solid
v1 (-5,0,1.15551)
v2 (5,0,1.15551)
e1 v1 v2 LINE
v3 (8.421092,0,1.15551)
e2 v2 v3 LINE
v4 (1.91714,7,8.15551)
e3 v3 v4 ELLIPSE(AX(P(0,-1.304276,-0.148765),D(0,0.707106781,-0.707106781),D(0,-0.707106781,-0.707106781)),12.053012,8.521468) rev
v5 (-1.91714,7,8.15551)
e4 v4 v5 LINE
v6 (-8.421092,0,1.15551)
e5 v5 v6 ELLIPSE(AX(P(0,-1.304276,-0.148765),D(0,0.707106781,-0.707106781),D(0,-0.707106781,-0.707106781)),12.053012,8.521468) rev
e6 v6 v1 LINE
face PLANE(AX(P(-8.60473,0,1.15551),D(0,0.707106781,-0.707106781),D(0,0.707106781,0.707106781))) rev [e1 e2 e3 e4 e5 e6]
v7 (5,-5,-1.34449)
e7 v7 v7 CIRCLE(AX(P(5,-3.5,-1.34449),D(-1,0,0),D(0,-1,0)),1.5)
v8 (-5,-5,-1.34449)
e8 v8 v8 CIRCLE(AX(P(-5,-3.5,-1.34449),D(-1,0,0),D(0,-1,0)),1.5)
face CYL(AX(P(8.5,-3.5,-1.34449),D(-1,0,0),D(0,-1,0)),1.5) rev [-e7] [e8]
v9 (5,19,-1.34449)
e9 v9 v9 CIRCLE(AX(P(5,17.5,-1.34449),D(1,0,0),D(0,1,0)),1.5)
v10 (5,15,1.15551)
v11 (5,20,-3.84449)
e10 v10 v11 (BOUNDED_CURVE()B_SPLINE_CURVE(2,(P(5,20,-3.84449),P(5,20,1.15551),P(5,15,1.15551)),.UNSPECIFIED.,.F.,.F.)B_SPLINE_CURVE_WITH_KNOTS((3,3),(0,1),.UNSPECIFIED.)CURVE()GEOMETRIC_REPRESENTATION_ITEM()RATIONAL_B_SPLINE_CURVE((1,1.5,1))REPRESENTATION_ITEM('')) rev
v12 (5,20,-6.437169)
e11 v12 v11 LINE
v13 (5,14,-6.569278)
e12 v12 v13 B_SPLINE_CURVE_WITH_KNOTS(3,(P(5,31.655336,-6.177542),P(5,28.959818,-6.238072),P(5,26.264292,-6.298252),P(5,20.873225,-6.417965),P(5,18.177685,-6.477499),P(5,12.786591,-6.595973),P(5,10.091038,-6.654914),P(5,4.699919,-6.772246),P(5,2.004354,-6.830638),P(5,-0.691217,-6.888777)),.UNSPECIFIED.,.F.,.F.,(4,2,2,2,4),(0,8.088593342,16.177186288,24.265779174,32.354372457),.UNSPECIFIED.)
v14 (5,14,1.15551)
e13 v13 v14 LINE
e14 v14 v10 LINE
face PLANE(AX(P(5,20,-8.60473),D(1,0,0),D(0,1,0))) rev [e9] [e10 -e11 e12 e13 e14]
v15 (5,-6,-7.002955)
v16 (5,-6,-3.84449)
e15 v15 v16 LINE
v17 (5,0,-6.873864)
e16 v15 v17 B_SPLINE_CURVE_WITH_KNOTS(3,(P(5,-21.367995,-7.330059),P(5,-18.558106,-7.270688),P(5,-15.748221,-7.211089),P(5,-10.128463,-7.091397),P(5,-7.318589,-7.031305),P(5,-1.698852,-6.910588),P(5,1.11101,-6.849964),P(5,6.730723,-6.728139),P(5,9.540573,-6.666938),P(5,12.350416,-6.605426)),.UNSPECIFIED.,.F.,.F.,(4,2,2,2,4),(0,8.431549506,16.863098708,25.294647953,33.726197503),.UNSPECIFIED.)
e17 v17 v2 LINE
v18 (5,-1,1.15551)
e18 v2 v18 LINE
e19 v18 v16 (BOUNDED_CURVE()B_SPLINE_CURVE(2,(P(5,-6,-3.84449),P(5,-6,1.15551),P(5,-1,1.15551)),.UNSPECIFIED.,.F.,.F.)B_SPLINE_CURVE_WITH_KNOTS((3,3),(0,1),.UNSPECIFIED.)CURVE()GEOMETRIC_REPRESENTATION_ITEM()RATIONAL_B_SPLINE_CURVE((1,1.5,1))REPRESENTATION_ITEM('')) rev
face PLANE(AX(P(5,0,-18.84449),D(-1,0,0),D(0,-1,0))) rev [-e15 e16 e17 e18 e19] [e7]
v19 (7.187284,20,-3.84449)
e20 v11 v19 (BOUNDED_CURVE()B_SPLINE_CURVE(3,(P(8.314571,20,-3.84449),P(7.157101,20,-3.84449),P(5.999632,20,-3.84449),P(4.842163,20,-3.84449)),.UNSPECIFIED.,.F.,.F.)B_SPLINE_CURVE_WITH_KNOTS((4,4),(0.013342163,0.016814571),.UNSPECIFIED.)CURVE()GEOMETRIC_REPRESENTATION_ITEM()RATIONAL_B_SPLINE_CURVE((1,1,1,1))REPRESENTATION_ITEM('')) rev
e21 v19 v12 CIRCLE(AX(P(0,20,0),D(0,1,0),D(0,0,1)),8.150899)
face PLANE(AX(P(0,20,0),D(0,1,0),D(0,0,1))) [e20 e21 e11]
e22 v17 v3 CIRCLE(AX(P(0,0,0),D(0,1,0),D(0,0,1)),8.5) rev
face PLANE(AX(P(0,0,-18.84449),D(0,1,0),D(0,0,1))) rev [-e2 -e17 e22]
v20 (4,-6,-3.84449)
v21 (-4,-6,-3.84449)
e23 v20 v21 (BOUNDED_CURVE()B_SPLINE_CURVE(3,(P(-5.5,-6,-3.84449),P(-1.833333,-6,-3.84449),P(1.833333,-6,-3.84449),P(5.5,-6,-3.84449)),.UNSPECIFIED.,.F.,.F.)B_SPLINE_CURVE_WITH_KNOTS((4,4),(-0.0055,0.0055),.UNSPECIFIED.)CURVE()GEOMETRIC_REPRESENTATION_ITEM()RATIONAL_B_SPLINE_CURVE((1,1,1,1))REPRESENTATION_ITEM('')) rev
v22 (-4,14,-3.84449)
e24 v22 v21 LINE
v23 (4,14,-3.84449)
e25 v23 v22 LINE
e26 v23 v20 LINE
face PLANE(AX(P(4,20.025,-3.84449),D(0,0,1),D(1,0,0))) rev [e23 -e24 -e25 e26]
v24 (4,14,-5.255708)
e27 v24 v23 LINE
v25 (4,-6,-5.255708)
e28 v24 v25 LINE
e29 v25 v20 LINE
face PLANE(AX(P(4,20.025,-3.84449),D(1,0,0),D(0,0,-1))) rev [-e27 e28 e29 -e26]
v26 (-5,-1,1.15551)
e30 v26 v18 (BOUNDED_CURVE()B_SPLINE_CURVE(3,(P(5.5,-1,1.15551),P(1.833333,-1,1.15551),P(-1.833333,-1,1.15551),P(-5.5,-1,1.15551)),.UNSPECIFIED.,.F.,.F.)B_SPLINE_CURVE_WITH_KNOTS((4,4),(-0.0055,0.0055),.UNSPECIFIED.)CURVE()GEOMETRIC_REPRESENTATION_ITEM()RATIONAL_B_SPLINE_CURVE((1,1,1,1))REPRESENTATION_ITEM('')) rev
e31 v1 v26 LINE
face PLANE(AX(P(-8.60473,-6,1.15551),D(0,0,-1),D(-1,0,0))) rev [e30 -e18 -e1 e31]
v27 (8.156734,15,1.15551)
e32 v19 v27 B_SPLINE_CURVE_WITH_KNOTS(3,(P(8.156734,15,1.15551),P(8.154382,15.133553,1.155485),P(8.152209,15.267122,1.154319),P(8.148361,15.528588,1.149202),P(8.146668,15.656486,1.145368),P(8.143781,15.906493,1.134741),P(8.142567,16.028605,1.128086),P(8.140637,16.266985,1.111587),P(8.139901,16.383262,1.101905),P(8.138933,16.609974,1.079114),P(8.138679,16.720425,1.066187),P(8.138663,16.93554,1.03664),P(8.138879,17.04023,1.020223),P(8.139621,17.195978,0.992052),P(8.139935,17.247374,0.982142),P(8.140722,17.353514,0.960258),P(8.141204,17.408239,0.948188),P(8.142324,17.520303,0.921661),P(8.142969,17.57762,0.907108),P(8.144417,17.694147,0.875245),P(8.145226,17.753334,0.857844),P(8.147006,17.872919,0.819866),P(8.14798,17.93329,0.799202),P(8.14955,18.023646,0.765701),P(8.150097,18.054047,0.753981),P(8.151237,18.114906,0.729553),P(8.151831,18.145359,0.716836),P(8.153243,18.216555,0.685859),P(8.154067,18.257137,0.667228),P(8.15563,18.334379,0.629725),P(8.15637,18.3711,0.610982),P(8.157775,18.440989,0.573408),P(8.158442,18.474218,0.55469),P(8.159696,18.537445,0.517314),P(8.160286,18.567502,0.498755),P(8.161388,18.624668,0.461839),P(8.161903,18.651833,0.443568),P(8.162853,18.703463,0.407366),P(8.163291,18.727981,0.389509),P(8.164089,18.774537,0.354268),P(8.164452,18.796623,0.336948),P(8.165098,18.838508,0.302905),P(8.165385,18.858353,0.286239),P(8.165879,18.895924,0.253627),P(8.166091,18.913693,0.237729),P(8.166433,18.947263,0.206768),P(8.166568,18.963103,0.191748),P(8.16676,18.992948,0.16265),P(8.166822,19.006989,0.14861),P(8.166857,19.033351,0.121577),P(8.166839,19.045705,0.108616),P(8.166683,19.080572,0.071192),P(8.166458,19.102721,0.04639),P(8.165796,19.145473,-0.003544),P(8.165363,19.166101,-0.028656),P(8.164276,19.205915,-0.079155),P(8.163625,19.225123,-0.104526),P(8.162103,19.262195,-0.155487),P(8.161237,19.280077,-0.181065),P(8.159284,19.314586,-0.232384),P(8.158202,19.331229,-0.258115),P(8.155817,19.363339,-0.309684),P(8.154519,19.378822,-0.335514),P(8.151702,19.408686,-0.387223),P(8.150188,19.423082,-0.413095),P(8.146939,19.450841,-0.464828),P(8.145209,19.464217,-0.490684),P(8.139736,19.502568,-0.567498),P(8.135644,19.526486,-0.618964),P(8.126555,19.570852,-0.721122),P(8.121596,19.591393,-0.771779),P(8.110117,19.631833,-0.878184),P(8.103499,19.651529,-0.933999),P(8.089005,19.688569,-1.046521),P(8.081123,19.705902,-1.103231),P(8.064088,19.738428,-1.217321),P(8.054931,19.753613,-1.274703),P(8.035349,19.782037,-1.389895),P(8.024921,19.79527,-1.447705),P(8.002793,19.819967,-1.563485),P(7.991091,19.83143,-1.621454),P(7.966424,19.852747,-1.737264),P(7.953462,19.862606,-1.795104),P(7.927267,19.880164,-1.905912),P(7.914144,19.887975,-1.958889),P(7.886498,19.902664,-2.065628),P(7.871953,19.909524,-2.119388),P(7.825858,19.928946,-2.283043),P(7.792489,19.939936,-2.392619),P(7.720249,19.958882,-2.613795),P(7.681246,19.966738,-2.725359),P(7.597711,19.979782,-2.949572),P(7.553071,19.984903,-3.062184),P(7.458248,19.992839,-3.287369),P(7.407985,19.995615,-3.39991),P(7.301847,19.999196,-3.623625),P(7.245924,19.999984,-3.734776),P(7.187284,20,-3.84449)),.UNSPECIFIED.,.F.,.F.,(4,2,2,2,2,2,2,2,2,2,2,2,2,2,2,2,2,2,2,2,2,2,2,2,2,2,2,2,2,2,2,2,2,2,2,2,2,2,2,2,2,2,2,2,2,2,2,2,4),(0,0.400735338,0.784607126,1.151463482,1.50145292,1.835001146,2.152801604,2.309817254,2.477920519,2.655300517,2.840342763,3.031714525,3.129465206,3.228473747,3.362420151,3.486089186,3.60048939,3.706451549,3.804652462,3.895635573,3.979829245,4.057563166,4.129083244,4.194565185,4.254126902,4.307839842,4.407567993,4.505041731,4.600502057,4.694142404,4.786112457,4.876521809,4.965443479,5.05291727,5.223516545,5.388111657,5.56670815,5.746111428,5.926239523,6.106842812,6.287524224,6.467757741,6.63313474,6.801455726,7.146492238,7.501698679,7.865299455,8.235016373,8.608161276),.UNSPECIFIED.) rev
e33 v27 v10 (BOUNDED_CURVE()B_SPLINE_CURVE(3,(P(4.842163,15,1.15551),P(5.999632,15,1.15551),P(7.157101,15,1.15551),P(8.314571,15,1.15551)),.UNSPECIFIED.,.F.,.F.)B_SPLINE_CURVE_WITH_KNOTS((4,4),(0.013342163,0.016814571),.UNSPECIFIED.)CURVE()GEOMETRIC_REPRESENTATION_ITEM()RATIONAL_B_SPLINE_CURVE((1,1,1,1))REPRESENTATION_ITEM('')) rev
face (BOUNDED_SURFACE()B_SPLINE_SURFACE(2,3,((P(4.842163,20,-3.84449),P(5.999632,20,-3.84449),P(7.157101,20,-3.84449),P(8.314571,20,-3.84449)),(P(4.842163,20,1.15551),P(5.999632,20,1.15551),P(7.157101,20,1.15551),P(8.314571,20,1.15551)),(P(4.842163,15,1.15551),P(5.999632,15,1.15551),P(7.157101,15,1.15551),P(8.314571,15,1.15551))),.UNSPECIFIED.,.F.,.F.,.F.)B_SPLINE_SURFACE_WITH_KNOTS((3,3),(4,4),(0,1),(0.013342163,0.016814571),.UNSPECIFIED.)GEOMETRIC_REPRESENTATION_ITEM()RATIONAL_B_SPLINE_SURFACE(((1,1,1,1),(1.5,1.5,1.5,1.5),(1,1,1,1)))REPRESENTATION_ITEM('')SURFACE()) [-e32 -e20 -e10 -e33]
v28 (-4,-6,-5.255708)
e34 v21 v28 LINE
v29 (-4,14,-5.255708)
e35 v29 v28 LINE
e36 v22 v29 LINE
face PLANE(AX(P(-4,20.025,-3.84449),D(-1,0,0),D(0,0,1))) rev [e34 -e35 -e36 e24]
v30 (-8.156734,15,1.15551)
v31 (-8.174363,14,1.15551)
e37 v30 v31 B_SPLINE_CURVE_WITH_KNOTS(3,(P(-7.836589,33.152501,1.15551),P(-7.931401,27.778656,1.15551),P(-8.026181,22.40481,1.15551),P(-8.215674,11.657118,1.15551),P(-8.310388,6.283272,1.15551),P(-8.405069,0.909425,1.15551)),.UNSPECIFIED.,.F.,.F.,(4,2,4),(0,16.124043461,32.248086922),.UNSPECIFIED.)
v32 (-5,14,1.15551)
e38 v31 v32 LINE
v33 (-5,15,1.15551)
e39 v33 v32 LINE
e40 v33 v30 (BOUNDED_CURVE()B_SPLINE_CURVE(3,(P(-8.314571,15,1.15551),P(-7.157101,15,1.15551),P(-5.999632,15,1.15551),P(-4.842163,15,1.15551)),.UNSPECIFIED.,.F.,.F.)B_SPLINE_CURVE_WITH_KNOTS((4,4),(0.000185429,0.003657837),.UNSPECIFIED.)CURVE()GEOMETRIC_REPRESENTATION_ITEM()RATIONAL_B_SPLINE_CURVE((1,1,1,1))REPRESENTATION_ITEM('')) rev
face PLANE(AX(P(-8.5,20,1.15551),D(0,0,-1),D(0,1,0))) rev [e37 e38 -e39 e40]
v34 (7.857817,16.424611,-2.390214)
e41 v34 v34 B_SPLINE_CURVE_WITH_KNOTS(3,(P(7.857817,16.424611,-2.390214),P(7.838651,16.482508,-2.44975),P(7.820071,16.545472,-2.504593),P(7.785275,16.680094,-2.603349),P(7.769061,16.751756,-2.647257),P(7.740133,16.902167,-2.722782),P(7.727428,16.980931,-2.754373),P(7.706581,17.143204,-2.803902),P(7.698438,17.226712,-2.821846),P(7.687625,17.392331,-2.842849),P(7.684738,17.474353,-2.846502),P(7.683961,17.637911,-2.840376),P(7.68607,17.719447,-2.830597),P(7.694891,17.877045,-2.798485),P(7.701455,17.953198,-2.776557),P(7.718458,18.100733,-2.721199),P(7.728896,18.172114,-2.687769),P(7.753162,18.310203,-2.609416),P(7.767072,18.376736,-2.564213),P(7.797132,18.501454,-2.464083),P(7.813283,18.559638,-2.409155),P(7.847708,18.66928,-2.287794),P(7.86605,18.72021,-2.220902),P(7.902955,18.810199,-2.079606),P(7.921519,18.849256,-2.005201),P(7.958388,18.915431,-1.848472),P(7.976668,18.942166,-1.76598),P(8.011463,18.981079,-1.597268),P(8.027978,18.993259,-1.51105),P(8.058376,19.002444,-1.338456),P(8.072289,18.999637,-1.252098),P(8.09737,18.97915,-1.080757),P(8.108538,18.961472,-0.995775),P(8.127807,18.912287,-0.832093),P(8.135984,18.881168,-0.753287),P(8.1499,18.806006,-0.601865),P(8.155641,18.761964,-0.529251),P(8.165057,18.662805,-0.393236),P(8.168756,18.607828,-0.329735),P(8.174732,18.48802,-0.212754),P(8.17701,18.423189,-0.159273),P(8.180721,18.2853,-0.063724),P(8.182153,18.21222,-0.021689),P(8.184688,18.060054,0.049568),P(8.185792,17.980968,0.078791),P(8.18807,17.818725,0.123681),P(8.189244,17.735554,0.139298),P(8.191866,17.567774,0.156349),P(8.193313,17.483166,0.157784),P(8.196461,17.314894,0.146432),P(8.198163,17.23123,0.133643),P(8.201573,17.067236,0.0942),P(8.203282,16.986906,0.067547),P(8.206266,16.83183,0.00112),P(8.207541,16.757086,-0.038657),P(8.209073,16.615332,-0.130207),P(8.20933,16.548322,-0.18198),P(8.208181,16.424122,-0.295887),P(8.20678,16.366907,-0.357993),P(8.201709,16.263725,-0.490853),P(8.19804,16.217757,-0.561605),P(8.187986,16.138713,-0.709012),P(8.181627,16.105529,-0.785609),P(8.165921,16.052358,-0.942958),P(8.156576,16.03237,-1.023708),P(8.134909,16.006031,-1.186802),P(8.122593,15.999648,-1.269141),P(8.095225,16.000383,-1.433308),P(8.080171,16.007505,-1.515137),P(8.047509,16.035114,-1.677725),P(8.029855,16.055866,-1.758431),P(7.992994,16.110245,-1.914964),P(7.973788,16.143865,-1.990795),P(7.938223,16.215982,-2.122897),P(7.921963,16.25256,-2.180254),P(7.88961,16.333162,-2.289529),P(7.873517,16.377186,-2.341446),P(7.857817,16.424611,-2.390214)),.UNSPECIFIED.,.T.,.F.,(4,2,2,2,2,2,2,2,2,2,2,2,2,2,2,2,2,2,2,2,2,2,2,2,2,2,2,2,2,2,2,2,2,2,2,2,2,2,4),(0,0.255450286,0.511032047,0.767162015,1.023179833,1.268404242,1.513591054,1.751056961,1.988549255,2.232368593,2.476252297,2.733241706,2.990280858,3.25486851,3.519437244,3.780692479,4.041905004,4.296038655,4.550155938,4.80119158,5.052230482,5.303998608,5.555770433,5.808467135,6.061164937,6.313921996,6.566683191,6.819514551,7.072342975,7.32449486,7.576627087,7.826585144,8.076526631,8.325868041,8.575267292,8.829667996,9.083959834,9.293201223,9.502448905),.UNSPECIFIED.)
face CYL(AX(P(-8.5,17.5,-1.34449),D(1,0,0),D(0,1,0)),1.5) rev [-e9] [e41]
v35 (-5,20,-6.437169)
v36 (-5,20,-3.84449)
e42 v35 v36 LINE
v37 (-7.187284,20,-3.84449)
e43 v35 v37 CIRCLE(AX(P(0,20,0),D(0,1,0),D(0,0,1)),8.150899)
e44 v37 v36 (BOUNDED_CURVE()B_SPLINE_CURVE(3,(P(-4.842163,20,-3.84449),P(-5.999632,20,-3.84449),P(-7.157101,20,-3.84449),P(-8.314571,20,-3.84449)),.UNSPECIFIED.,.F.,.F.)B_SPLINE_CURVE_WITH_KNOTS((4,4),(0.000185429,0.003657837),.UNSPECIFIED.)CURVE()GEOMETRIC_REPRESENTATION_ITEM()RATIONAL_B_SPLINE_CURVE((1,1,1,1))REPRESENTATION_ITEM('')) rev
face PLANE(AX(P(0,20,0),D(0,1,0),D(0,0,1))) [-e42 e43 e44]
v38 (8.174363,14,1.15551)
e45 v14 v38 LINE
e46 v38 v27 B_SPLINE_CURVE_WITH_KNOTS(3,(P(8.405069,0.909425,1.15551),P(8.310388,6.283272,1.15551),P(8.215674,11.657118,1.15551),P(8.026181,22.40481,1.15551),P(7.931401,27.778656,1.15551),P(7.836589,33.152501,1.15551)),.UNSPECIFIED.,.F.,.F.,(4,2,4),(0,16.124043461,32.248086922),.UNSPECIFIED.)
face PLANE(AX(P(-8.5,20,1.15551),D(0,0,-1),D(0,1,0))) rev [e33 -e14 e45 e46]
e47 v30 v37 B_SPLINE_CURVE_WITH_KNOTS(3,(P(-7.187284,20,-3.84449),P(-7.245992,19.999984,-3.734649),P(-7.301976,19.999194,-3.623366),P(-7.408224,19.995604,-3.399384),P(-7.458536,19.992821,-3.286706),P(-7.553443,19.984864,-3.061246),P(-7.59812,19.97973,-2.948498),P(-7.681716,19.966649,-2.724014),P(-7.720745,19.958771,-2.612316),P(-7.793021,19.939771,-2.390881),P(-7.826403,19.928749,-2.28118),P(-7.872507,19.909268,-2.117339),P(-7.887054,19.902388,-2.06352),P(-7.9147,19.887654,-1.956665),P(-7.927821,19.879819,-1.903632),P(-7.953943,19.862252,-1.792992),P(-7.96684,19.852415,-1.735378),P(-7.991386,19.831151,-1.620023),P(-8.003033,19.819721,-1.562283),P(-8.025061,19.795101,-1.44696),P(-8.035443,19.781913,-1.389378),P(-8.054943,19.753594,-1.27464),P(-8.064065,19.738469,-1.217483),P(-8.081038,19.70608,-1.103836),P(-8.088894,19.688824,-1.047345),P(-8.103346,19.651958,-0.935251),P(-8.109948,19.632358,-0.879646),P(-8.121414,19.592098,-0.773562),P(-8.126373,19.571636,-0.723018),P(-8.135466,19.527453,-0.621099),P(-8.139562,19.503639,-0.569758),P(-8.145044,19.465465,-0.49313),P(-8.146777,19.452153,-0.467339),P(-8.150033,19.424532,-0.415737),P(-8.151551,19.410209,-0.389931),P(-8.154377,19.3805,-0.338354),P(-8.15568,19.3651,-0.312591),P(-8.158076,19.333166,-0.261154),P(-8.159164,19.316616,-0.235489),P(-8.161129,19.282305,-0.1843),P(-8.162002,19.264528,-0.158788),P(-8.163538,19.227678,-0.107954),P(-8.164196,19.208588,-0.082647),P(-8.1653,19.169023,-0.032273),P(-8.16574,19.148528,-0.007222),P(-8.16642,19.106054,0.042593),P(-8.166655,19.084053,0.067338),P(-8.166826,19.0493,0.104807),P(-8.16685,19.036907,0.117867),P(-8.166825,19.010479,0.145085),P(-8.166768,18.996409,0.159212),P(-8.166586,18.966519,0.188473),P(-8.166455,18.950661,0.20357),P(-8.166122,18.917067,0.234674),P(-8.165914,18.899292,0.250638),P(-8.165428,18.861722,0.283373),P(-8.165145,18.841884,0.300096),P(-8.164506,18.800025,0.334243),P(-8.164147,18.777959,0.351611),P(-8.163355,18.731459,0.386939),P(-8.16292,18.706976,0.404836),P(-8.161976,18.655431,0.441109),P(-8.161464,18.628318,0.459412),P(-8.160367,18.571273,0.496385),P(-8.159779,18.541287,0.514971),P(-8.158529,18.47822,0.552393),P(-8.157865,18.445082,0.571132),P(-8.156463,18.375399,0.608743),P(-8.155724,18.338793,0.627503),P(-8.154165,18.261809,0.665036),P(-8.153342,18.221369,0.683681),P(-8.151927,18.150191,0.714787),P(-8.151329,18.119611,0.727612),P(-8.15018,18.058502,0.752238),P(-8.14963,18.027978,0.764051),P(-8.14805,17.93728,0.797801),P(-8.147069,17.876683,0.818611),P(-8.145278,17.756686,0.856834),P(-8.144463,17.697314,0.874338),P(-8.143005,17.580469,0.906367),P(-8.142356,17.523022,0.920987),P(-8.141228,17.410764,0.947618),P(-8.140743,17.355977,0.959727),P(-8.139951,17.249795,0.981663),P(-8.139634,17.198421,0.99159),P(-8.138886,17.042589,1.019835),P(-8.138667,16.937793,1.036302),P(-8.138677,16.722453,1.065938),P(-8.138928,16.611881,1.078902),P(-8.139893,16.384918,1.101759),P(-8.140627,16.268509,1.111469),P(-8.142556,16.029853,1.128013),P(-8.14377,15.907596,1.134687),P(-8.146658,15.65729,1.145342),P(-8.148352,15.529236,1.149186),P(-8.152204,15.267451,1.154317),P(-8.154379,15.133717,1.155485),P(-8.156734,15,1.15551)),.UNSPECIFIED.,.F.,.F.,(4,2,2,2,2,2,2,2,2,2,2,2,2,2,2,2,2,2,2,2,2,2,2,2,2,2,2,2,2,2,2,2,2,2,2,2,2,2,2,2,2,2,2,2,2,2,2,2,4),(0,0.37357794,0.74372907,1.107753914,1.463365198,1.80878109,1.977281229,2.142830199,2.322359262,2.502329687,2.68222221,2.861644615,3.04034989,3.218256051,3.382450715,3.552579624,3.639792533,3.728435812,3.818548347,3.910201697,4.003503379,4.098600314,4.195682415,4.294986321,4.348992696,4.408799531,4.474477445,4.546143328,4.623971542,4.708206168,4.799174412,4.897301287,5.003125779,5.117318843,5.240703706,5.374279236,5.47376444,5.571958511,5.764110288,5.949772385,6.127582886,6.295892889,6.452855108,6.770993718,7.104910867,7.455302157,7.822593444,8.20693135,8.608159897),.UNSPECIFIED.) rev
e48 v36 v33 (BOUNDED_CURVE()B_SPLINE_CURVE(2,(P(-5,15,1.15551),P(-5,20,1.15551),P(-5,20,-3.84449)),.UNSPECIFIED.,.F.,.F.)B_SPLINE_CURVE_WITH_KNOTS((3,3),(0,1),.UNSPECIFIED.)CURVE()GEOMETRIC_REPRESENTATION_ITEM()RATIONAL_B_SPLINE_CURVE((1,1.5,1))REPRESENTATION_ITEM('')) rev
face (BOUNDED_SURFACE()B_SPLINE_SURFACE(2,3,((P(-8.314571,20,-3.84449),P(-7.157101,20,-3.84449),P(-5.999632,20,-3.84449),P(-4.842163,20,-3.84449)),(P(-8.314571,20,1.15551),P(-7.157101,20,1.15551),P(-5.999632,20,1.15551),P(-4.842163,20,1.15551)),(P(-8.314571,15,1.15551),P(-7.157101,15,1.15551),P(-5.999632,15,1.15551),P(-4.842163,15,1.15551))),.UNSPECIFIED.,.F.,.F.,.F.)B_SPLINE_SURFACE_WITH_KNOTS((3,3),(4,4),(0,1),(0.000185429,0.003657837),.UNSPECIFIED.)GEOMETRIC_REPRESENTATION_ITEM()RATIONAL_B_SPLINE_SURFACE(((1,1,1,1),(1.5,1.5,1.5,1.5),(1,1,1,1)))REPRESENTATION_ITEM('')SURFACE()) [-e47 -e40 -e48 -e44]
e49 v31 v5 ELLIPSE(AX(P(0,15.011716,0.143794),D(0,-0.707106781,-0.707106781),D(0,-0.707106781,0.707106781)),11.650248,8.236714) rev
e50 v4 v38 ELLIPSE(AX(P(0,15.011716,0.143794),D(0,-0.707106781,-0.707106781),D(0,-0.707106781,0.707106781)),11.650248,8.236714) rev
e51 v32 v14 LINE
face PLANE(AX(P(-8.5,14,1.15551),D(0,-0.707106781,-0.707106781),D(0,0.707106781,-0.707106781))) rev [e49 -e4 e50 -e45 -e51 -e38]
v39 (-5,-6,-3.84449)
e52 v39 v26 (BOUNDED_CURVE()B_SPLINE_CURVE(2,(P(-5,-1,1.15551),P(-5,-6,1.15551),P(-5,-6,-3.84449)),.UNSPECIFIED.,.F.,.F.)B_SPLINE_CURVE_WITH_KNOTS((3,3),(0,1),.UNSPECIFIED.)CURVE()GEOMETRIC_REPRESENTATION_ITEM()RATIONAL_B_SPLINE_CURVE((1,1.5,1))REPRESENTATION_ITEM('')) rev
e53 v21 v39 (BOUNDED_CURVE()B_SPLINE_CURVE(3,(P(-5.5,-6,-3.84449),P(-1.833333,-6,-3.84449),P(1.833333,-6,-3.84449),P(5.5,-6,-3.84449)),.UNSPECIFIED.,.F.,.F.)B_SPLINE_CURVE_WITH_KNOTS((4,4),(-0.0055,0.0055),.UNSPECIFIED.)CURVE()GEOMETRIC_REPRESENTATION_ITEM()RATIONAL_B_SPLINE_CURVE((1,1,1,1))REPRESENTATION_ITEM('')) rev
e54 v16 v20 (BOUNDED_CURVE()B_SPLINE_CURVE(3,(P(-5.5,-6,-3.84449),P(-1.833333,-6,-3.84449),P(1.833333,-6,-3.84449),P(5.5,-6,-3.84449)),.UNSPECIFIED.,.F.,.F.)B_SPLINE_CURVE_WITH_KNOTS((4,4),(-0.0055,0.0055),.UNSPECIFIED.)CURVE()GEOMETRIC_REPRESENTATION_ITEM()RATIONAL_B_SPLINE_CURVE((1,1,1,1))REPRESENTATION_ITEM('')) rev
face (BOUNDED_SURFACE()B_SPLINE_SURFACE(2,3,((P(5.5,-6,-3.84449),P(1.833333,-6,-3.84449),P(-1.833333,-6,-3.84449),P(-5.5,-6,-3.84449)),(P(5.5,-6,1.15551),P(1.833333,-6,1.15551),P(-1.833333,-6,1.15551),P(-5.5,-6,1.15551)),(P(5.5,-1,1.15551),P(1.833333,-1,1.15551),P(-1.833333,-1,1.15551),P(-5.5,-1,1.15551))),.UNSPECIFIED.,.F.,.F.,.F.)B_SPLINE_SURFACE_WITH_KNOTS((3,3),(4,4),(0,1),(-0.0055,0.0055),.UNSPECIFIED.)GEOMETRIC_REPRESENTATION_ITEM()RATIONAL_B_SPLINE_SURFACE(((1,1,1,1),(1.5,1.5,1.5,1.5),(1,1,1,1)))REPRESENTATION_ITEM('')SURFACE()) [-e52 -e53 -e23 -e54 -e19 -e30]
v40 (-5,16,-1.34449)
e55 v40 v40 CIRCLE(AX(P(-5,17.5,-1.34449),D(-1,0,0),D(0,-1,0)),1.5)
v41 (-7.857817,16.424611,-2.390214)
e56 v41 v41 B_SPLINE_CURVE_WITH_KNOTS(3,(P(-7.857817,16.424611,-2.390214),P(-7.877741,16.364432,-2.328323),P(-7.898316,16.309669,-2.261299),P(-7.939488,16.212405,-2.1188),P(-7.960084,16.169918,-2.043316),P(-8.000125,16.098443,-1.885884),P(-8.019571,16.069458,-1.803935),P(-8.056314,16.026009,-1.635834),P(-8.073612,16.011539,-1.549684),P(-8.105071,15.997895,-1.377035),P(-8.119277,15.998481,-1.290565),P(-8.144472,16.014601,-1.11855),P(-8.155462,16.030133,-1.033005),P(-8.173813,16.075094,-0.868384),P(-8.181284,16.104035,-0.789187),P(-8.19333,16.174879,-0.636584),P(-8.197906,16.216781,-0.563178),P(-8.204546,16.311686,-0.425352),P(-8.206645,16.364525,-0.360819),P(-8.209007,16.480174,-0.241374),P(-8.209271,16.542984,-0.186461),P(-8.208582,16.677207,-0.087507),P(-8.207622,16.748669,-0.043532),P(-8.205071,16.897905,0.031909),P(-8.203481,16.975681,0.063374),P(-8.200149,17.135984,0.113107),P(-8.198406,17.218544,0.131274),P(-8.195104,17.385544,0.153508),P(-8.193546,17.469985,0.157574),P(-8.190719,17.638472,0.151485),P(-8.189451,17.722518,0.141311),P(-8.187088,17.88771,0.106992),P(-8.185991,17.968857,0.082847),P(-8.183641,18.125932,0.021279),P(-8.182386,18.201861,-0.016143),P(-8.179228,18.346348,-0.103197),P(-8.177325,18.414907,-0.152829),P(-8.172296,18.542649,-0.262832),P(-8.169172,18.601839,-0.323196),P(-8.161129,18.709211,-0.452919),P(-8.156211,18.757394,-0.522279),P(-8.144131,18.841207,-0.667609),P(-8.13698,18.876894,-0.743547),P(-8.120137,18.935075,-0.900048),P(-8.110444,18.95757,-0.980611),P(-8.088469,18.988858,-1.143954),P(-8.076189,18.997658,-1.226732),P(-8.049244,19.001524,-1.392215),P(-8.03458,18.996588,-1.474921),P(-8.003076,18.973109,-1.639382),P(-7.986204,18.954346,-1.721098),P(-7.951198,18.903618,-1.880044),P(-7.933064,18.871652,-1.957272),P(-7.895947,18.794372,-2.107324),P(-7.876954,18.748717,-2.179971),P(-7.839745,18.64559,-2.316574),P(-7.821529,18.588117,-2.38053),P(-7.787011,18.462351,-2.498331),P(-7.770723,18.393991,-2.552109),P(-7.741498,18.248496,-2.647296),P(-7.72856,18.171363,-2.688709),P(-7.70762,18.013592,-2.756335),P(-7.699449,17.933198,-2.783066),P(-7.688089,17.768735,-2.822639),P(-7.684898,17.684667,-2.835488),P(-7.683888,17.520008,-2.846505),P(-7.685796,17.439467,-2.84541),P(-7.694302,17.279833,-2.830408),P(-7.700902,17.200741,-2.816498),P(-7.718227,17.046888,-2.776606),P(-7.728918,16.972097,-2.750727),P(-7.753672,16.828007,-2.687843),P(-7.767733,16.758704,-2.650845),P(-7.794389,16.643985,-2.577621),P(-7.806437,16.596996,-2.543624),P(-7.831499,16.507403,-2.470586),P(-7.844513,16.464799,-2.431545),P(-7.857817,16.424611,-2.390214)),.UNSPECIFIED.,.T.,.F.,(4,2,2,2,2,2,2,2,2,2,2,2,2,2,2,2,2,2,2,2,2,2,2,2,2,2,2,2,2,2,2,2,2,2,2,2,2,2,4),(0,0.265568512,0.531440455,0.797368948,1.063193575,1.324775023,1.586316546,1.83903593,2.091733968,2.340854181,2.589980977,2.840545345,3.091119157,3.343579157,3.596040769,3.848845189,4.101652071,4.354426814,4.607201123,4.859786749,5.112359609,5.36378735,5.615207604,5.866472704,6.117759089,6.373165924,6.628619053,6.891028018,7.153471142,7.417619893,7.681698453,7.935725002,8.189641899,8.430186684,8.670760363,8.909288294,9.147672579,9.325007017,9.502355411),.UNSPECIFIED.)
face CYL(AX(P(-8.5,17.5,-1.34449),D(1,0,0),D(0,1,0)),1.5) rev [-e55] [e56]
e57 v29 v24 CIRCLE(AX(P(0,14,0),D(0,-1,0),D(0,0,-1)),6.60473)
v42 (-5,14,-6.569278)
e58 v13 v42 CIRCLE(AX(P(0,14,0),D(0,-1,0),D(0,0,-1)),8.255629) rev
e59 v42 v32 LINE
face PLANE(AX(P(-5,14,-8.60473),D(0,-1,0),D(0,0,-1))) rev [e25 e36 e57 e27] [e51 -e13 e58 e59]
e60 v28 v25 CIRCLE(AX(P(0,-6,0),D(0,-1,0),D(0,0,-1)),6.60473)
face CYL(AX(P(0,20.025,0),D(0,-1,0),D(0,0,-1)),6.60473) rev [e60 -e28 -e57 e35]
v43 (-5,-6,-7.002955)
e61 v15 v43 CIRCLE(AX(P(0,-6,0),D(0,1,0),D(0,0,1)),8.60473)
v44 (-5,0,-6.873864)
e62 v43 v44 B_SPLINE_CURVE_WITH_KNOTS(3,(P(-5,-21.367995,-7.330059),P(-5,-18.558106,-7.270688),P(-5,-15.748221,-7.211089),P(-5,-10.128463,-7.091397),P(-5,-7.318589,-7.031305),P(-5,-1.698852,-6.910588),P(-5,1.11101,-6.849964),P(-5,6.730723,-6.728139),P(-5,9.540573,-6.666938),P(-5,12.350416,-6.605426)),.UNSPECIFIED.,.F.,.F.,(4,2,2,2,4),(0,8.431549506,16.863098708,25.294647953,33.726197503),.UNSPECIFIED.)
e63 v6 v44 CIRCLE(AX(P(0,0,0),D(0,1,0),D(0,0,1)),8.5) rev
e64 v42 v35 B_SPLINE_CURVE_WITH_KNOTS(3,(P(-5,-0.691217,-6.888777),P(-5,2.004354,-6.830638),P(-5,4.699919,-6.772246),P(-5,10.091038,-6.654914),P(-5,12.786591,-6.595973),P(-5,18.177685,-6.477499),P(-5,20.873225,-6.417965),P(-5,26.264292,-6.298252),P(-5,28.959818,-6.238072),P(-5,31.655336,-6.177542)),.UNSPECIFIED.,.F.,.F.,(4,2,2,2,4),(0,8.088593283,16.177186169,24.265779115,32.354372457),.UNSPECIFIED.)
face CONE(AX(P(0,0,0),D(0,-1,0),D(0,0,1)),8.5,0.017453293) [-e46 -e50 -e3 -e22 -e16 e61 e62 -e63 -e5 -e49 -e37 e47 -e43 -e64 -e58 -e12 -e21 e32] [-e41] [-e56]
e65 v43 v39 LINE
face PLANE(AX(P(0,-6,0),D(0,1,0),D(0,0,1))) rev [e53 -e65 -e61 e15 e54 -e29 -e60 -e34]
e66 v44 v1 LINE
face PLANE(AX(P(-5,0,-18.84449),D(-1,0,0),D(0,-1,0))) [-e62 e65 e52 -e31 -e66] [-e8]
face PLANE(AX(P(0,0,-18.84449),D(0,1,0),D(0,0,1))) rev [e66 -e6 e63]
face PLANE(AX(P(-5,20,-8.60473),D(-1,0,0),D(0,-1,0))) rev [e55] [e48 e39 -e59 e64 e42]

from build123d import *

# Parameters (mm, degrees)
SKETCH1_R                     = 8.5
BOSS_EXTRUDE1_DEPTH           = 20
BOSS_EXTRUDE1_TAPER           = 1
BOSS_EXTRUDE1_OTHER_WAY_DEPTH = 6
BOSS_EXTRUDE1_OTHER_WAY_TAPER = -1
CUT_EXTRUDE1_DEPTH            = 24.411167638
CUT_EXTRUDE1_DEPTH_BACK       = 24.411167638
CUT_EXTRUDE2_START            = -9.76024089
CUT_EXTRUDE2_OUTLINE_W        = 9.770566763
CUT_EXTRUDE2_OUTLINE_H        = 6
CUT_EXTRUDE2_DEPTH            = 9.76024089
CUT_EXTRUDE3_DEPTH            = 26.618184821
CUT_EXTRUDE3_DEPTH_BACK       = 26.618184821
SKETCH5_R                     = 1.5
FILLET1_SIZE                  = 5
CUT_EXTRUDE4_DEPTH            = 24.372877283
CUT_EXTRUDE4_DEPTH_BACK       = 24.372877283
SKETCH8_W                     = 10
SKETCH8_H                     = 6
CUT_EXTRUDE5_DEPTH            = 24.822516826
CUT_EXTRUDE6_DEPTH            = 26.618184821
CUT_EXTRUDE6_DEPTH_BACK       = 26.618184821
SKETCH9_R                     = 1.5
FILLET2_SIZE                  = 5
CUT_EXTRUDE7_DEPTH            = 29.675623685


with BuildPart() as part:
    # Sketch1 → Boss-Extrude1 (new body)
    with BuildSketch(Plane(origin=(0, 0, 0), x_dir=(1, 0, 0), z_dir=(0, 1, 0))):
        Circle(SKETCH1_R)
    extrude(amount=BOSS_EXTRUDE1_DEPTH, taper=BOSS_EXTRUDE1_TAPER)

    # Sketch1 → Boss-Extrude1 other way (add)
    with BuildSketch(Plane(origin=(0, 0, 0), x_dir=(1, 0, 0), z_dir=(0, 1, 0))):
        Circle(SKETCH1_R)
    extrude(amount=-BOSS_EXTRUDE1_OTHER_WAY_DEPTH, taper=BOSS_EXTRUDE1_OTHER_WAY_TAPER)

    # Sketch3 → Cut-Extrude1 (cut, two sides: drawn at the far end of the back side and taken through both)
    with BuildSketch(Plane(origin=(0, 0, 0), x_dir=(0, 0, -1), z_dir=(1, 0, 0)).offset(-CUT_EXTRUDE1_DEPTH_BACK)):
        Polygon((-1.155510401, -6), (-1.155510401, 0), (-11.155510401, 10), (-11.155510401, -6), align=None)
    extrude(amount=CUT_EXTRUDE1_DEPTH + CUT_EXTRUDE1_DEPTH_BACK, mode=Mode.SUBTRACT)

    # Cut-Extrude2: read off the stored shape, not the designer's step
    # Cut-Extrude2 outline → Cut-Extrude2 (cut)
    with BuildSketch(Plane.XY.offset(1.155510401).offset(CUT_EXTRUDE2_START)):
        with Locations((-9.885283382, -3)):
            Rectangle(CUT_EXTRUDE2_OUTLINE_W, CUT_EXTRUDE2_OUTLINE_H)
        with Locations((9.885283382, -3)):
            Rectangle(CUT_EXTRUDE2_OUTLINE_W, CUT_EXTRUDE2_OUTLINE_H)
    extrude(amount=CUT_EXTRUDE2_DEPTH, mode=Mode.SUBTRACT)

    # Sketch5 → Cut-Extrude3 (cut, two sides: drawn at the far end of the back side and taken through both)
    with BuildSketch(Plane.ZY.offset(5).offset(-CUT_EXTRUDE3_DEPTH_BACK)):
        with Locations(Location((-1.344489599, -3.5, 0), (0, 0, 270))):
            Circle(SKETCH5_R)
    extrude(amount=CUT_EXTRUDE3_DEPTH + CUT_EXTRUDE3_DEPTH_BACK, mode=Mode.SUBTRACT)

    # Fillet1
    # a fillet whose section is not a circle: 5 mm, written as the material it takes off along each edge
    with BuildSketch(Plane(origin=(17.5, -6, 1.155510401), x_dir=(0, 0, -1), z_dir=(-1, 0, 0))) as fillet1_piece_1:
        with BuildLine():
            Bezier((FILLET1_SIZE, 0), (0, 0), (0, -FILLET1_SIZE), weights=[1, 1.5, 1])
            Line((0, -FILLET1_SIZE), (0, 0))
            Line((0, 0), (FILLET1_SIZE, 0))
        make_face()
    extrude(amount=35, mode=Mode.SUBTRACT)

    # Sketch7 → Cut-Extrude4 (cut, two sides: drawn at the far end of the back side and taken through both)
    with BuildSketch(Plane(origin=(0, 0, 0), x_dir=(0, 0, -1), z_dir=(1, 0, 0)).offset(-CUT_EXTRUDE4_DEPTH_BACK)):
        Polygon((-1.155510401, 20), (-1.155510401, 14), (-12.24506556, 2.91044484), (-12.24506556, 20), align=None)
    extrude(amount=CUT_EXTRUDE4_DEPTH + CUT_EXTRUDE4_DEPTH_BACK, mode=Mode.SUBTRACT)

    # Sketch8 → Cut-Extrude5 (cut, through all)
    with BuildSketch(Plane.XY.offset(1.155510401)):
        with Locations((0, 17)):
            Rectangle(SKETCH8_W, SKETCH8_H)
    extrude(amount=-CUT_EXTRUDE5_DEPTH, mode=Mode.SUBTRACT)

    # Sketch9 → Cut-Extrude6 (cut, two sides: drawn at the far end of the back side and taken through both)
    with BuildSketch(Plane(origin=(-5, 0, 0), x_dir=(0, 0, -1), z_dir=(1, 0, 0)).offset(-CUT_EXTRUDE6_DEPTH_BACK)):
        with Locations(Location((1.344489599, 17.5, 0), (0, 0, 314.198748603))):
            Circle(SKETCH9_R)
    extrude(amount=CUT_EXTRUDE6_DEPTH + CUT_EXTRUDE6_DEPTH_BACK, mode=Mode.SUBTRACT)

    # Fillet2
    # a fillet whose section is not a circle: 5 mm, written as the material it takes off along each edge
    with BuildSketch(Plane(origin=(-20.568577654, 20, 1.155510401), x_dir=(0, 0, -1), z_dir=(1, 0, 0))) as fillet2_piece_1:
        with BuildLine():
            Bezier((FILLET2_SIZE, 0), (0, 0), (0, -FILLET2_SIZE), weights=[1, 1.5, 1])
            Line((0, -FILLET2_SIZE), (0, 0))
            Line((0, 0), (FILLET2_SIZE, 0))
        make_face()
    extrude(amount=28.068577654, mode=Mode.SUBTRACT)
    with BuildSketch(Plane(origin=(-7.5, 20, 1.155510401), x_dir=(0, -1, 0), z_dir=(1, 0, 0))) as fillet2_piece_2:
        with BuildLine():
            Bezier((FILLET2_SIZE, 0), (0, 0), (0, FILLET2_SIZE), weights=[1, 1.5, 1])
            Line((0, FILLET2_SIZE), (0, 0))
            Line((0, 0), (FILLET2_SIZE, 0))
        make_face()
    extrude(amount=28.068577654, mode=Mode.SUBTRACT)

    # Sketch10 → Cut-Extrude7 (cut, through all)
    with BuildSketch(Plane.XZ.offset(6)):
        with BuildLine():
            Line((-4, -3.844489599), (-4, -5.255707709))
            ThreePointArc((-4, -5.255707709), (0, -6.60473039), (4, -5.255707709))
            Line((4, -5.255707709), (4, -3.844489599))
            Line((4, -3.844489599), (-4, -3.844489599))
        make_face()
    extrude(amount=-CUT_EXTRUDE7_DEPTH, mode=Mode.SUBTRACT)


solid = part.part
